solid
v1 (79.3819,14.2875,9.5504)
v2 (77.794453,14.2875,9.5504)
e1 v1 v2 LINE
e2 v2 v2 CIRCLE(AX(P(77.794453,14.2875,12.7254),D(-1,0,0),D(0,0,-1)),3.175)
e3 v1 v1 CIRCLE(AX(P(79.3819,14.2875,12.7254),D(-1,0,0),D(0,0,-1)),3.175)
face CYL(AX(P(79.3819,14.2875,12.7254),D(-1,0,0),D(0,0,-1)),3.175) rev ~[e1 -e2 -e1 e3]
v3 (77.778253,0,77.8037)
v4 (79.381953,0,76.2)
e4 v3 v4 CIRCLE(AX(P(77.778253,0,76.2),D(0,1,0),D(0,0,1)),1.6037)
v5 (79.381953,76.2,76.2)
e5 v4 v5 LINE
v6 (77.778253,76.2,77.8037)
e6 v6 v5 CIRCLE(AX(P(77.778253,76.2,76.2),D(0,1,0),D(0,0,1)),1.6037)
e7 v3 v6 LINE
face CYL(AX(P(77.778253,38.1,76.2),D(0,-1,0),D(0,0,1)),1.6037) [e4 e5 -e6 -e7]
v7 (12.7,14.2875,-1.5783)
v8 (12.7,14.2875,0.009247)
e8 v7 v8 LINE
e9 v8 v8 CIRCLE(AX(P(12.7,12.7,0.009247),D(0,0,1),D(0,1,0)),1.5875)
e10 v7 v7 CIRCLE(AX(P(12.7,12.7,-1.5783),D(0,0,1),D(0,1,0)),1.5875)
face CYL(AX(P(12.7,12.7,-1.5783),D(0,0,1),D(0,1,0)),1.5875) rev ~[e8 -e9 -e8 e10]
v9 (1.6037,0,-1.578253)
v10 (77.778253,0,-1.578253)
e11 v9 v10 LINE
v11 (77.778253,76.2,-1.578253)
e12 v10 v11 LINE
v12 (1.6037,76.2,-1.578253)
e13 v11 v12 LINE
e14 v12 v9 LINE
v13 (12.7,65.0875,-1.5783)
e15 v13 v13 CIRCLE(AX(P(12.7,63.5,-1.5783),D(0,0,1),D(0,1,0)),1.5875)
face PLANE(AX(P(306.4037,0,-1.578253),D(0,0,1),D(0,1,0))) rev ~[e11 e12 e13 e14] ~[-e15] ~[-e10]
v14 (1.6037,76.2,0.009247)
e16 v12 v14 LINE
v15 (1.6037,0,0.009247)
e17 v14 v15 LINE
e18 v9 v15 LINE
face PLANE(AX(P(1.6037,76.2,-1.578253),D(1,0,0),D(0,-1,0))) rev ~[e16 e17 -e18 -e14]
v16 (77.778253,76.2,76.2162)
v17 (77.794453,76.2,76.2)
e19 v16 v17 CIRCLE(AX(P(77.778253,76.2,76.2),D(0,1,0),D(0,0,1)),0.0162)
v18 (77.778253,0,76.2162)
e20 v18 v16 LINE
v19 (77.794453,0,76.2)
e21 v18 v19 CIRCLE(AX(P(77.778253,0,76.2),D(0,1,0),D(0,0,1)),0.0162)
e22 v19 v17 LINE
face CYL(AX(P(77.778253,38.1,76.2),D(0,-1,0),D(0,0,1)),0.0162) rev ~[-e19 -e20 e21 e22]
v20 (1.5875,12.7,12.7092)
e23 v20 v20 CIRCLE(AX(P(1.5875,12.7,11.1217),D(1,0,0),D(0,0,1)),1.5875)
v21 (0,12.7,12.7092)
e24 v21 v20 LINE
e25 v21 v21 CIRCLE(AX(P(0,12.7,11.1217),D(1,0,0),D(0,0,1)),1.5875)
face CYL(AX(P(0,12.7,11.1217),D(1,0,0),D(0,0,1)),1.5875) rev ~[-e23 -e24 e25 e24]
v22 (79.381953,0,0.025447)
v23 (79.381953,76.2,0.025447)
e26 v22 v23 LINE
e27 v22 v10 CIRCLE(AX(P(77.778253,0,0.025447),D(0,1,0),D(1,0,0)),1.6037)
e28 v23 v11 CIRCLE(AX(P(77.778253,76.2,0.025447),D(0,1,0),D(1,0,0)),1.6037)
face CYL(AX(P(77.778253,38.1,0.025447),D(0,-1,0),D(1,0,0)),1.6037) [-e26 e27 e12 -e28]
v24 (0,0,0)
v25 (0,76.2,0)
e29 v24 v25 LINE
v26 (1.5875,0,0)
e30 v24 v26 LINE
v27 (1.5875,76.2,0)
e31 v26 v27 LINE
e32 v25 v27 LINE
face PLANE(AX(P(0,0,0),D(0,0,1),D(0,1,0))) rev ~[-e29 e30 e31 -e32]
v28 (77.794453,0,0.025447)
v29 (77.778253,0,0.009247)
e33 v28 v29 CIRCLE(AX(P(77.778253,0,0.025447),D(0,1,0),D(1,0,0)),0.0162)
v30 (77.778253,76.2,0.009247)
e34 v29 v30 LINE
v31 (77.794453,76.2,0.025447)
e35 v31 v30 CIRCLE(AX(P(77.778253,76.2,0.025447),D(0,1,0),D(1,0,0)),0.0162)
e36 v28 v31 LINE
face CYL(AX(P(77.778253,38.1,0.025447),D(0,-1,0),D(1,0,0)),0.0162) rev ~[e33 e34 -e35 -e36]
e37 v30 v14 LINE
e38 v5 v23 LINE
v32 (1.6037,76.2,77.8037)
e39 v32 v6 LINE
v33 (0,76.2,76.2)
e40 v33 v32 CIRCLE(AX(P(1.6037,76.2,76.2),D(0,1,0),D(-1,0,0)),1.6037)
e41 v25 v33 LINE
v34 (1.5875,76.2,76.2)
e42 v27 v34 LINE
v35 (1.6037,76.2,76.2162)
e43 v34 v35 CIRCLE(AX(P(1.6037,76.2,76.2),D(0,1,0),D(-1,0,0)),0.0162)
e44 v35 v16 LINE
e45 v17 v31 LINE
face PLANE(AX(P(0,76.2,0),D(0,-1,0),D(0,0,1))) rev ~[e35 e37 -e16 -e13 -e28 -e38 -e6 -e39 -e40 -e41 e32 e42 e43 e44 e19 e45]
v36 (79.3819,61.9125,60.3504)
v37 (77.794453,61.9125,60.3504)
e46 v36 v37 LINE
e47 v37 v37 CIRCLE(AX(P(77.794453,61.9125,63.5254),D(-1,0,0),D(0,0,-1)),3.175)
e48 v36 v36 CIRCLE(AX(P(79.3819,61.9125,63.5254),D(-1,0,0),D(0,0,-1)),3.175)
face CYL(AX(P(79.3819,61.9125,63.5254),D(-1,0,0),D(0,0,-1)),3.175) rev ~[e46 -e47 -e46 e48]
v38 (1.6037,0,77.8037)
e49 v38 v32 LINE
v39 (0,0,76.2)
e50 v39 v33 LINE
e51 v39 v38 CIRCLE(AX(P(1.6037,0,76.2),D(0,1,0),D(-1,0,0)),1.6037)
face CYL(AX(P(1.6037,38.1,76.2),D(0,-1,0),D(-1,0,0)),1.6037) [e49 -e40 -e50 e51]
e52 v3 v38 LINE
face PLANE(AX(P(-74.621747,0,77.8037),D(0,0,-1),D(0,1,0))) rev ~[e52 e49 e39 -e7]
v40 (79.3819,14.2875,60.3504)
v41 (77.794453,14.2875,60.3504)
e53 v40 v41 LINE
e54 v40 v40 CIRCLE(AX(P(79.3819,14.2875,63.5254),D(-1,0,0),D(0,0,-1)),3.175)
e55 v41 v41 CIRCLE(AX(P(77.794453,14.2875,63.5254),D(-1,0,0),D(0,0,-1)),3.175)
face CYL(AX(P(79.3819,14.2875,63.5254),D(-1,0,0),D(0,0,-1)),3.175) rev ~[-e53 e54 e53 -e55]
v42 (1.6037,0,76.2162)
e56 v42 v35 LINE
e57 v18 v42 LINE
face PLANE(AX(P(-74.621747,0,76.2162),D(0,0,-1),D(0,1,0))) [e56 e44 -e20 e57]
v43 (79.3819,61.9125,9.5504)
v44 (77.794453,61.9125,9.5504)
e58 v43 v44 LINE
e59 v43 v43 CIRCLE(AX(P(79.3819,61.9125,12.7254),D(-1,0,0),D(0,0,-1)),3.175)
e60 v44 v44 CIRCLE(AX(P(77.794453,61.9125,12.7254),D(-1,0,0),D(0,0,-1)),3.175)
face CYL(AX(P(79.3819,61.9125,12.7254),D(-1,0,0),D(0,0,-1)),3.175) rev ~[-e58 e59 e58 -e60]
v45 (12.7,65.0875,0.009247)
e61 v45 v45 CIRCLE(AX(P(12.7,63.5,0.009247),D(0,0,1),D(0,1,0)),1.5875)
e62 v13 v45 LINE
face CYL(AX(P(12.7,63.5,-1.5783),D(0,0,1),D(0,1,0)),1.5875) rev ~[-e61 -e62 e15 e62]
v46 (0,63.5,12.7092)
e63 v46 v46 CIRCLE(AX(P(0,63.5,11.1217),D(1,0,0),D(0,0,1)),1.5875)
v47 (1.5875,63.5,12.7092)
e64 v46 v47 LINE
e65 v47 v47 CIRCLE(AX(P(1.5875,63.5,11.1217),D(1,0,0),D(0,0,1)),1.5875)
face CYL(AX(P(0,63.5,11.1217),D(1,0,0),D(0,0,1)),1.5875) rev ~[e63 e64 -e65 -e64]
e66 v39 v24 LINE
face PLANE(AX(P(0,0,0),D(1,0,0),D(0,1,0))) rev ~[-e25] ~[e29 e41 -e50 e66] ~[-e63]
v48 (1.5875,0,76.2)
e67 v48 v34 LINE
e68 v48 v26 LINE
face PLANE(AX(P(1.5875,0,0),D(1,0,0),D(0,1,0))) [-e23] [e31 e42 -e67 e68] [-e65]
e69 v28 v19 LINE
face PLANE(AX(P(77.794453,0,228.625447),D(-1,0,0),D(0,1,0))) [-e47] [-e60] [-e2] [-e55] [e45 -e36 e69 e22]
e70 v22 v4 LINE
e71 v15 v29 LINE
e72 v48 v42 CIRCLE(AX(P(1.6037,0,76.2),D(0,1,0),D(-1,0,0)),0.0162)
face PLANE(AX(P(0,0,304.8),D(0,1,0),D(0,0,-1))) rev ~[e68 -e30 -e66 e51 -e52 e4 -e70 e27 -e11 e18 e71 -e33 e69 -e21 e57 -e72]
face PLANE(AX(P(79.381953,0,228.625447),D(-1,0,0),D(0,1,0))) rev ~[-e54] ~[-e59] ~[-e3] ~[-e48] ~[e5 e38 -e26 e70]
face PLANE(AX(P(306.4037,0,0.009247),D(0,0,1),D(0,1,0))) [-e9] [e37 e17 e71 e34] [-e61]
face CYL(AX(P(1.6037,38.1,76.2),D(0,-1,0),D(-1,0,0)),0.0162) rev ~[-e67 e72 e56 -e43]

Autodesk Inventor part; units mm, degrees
ref_plane "YZ Plane" through (0, 0, 0) normal (1, 0, 0) x (0, 1, 0)
ref_plane "XZ Plane" through (0, 0, 0) normal (0, 1, 0) x (-1, 0, 0)
ref_plane "XY Plane" through (0, 0, 0) normal (0, 0, 1) x (1, 0, 0)
sketch "Sketch4" plane through (0, 0, 0) normal (1, 0, 0) x (0, 1, 0)
  line L0 (0, 0) -> (76.2, 0)
  line L1 (76.2, 0) -> (76.2, 304.8)
  line L2 (76.2, 304.8) -> (0, 304.8)
  line L3 (0, 304.8) -> (0, 0)
  dimension "d7" = 76.2
  dimension "d8" = 304.8
extrude "Extrusion2" add sketch "Sketch4" along normal blind 1.5875
sketch "Sketch5" plane through (1.5875, 0, 0) normal (1, 0, 0) x (0, 0, -1)
  line L0 (0, 0) -> (0, 76.2) projected
  line L1 (0, 76.2) -> (-304.8, 76.2) projected
  line L2 (-304.8, 76.2) -> (-304.8, 0) projected
  line L3 (-304.8, 0) -> (0, 0) projected
  line L4 (-228.6, 76.2) -> (-228.6, 0)
  line L5 (-152.4, 76.2) -> (-152.4, 0)
  line L6 (-76.2, 76.2) -> (-76.2, 0)
  dimension "d11" = 76.2
  dimension "d12" = 76.2
  dimension "d13" = 76.2
bend part "Bend Part2" radius 0.0162 angle 90 line through (1.5875, 76.2, 228.6) along (0, -1, 0) centre toward (1, 0, 0) moving side (0, 0, 1) both sides no
sketch "Sketch6" plane through (1.5875, 0, 0) normal (1, 0, 0) x (0, 0, -1)
  line L0 (-228.6, 0) -> (-228.6, 76.2) projected
  line L1 (-228.6, 0) -> (0, 0) projected
  line L2 (0, 76.2) -> (-228.6, 76.2) projected
  line L3 (-152.4, 76.2) -> (-152.4, 0)
  dimension "d16" = 76.2
bend part "Bend Part3" radius 0.0162 angle 90 line through (1.5875, 76.2, 152.4) along (0, -1, 0) centre toward (1, 0, 0) moving side (0, 0, 1) both sides no
sketch "Sketch7" plane through (1.5875, 0, 0) normal (1, 0, 0) x (0, 0, -1)
  line L0 (-152.4, 0) -> (-152.4, 76.2) projected
  line L1 (-152.4, 0) -> (0, 0) projected
  line L2 (0, 76.2) -> (-152.4, 76.2) projected
  line L3 (-76.2, 76.2) -> (-76.2, -0.6756)
  dimension "d19" = 76.2
bend part "Bend Part4" radius 0.0162 angle 90 line through (1.5875, 76.2, 76.2) along (0, -1, 0) centre toward (1, 0, 0) moving side (0, 0, 1) both sides no
sketch "Sketch8" plane through (77.7783, 0, -1.5783) normal (0, 0, -1) x (-1, 0, 0)
  line L0 (76.1746, 0) -> (0, 0) projected
  line L1 (0, 76.2) -> (76.1746, 76.2) projected
  line L2 (77.7783, 0) -> (77.7783, 76.2) projected
  point P0 (65.0783, 63.5)
  point P1 (65.0783, 12.7)
  dimension "d22" = 12.7
  dimension "d23" = 12.7
  dimension "d24" = 12.7
  dimension "d25" = 12.7
hole "Hole1" at (12.7, 63.5, -1.5783) at (12.7, 12.7, -1.5783) direction (0, 0, 1) diameter 3.175 depth 25.4 tip angle 118
sketch "Sketch9" plane through (0, 0, 0) normal (-1, 0, 0) x (0, 0, 1)
  line L0 (0, 76.2) -> (76.2, 76.2) projected
  line L1 (76.2, 0) -> (0, 0) projected
  line L2 (-1.5783, 76.2) -> (-1.5783, 0) projected
  point P0 (11.1217, 63.5)
  point P1 (11.1217, 12.7)
  dimension "d33" = 12.7
  dimension "d34" = 12.7
  dimension "d35" = 12.7
  dimension "d36" = 12.7
hole "Hole2" at (0, 63.5, 11.1217) at (0, 12.7, 11.1217) direction (1, 0, 0) diameter 3.175 depth 25.4 tip angle 118
sketch "Sketch10" plane through (79.3819, 0, 76.2) normal (1, 0, 0) x (0, 0, -1)
  line L0 (0, 76.2) -> (0, 0) projected
  line L1 (76.1746, 0) -> (0, 0) projected
  line L2 (76.1746, 76.2) -> (76.1746, 0) projected
  line L3 (0, 76.2) -> (76.1746, 76.2) projected
  point P0 (76.2, 0)
sketch "Sketch11" plane through (79.3819, 0, 76.2) normal (1, 0, 0) x (0, 0, -1)
  line L0 (76.1746, 76.2) -> (76.1746, 0) projected
  line L1 (0, 76.2) -> (76.1746, 76.2) projected
  line L2 (76.1746, 0) -> (0, 0) projected
  point P0 (76.2, 0)
  point P1 (12.6746, 61.9125)
  point P2 (63.4746, 61.9125)
  point P3 (12.6746, 14.2875)
  point P4 (63.4746, 14.2875)
  dimension "d46" = 14.2875
  dimension "d47" = 14.2875
  dimension "d49" = 12.7
  dimension "d57" = 14.2875
  dimension "d58" = 14.2875
  dimension "d60" = 12.7
  dimension "d62" = 50.8
  dimension "d63" = 50.8
hole "Hole3" at (79.3819, 61.9125, 63.5254) at (79.3819, 61.9125, 12.7254) at (79.3819, 14.2875, 63.5254) at (79.3819, 14.2875, 12.7254) direction (-1, 0, 0) diameter 6.35 depth 25.4 tip angle 118
properties part number "Box" material "Aluminum 6061"
